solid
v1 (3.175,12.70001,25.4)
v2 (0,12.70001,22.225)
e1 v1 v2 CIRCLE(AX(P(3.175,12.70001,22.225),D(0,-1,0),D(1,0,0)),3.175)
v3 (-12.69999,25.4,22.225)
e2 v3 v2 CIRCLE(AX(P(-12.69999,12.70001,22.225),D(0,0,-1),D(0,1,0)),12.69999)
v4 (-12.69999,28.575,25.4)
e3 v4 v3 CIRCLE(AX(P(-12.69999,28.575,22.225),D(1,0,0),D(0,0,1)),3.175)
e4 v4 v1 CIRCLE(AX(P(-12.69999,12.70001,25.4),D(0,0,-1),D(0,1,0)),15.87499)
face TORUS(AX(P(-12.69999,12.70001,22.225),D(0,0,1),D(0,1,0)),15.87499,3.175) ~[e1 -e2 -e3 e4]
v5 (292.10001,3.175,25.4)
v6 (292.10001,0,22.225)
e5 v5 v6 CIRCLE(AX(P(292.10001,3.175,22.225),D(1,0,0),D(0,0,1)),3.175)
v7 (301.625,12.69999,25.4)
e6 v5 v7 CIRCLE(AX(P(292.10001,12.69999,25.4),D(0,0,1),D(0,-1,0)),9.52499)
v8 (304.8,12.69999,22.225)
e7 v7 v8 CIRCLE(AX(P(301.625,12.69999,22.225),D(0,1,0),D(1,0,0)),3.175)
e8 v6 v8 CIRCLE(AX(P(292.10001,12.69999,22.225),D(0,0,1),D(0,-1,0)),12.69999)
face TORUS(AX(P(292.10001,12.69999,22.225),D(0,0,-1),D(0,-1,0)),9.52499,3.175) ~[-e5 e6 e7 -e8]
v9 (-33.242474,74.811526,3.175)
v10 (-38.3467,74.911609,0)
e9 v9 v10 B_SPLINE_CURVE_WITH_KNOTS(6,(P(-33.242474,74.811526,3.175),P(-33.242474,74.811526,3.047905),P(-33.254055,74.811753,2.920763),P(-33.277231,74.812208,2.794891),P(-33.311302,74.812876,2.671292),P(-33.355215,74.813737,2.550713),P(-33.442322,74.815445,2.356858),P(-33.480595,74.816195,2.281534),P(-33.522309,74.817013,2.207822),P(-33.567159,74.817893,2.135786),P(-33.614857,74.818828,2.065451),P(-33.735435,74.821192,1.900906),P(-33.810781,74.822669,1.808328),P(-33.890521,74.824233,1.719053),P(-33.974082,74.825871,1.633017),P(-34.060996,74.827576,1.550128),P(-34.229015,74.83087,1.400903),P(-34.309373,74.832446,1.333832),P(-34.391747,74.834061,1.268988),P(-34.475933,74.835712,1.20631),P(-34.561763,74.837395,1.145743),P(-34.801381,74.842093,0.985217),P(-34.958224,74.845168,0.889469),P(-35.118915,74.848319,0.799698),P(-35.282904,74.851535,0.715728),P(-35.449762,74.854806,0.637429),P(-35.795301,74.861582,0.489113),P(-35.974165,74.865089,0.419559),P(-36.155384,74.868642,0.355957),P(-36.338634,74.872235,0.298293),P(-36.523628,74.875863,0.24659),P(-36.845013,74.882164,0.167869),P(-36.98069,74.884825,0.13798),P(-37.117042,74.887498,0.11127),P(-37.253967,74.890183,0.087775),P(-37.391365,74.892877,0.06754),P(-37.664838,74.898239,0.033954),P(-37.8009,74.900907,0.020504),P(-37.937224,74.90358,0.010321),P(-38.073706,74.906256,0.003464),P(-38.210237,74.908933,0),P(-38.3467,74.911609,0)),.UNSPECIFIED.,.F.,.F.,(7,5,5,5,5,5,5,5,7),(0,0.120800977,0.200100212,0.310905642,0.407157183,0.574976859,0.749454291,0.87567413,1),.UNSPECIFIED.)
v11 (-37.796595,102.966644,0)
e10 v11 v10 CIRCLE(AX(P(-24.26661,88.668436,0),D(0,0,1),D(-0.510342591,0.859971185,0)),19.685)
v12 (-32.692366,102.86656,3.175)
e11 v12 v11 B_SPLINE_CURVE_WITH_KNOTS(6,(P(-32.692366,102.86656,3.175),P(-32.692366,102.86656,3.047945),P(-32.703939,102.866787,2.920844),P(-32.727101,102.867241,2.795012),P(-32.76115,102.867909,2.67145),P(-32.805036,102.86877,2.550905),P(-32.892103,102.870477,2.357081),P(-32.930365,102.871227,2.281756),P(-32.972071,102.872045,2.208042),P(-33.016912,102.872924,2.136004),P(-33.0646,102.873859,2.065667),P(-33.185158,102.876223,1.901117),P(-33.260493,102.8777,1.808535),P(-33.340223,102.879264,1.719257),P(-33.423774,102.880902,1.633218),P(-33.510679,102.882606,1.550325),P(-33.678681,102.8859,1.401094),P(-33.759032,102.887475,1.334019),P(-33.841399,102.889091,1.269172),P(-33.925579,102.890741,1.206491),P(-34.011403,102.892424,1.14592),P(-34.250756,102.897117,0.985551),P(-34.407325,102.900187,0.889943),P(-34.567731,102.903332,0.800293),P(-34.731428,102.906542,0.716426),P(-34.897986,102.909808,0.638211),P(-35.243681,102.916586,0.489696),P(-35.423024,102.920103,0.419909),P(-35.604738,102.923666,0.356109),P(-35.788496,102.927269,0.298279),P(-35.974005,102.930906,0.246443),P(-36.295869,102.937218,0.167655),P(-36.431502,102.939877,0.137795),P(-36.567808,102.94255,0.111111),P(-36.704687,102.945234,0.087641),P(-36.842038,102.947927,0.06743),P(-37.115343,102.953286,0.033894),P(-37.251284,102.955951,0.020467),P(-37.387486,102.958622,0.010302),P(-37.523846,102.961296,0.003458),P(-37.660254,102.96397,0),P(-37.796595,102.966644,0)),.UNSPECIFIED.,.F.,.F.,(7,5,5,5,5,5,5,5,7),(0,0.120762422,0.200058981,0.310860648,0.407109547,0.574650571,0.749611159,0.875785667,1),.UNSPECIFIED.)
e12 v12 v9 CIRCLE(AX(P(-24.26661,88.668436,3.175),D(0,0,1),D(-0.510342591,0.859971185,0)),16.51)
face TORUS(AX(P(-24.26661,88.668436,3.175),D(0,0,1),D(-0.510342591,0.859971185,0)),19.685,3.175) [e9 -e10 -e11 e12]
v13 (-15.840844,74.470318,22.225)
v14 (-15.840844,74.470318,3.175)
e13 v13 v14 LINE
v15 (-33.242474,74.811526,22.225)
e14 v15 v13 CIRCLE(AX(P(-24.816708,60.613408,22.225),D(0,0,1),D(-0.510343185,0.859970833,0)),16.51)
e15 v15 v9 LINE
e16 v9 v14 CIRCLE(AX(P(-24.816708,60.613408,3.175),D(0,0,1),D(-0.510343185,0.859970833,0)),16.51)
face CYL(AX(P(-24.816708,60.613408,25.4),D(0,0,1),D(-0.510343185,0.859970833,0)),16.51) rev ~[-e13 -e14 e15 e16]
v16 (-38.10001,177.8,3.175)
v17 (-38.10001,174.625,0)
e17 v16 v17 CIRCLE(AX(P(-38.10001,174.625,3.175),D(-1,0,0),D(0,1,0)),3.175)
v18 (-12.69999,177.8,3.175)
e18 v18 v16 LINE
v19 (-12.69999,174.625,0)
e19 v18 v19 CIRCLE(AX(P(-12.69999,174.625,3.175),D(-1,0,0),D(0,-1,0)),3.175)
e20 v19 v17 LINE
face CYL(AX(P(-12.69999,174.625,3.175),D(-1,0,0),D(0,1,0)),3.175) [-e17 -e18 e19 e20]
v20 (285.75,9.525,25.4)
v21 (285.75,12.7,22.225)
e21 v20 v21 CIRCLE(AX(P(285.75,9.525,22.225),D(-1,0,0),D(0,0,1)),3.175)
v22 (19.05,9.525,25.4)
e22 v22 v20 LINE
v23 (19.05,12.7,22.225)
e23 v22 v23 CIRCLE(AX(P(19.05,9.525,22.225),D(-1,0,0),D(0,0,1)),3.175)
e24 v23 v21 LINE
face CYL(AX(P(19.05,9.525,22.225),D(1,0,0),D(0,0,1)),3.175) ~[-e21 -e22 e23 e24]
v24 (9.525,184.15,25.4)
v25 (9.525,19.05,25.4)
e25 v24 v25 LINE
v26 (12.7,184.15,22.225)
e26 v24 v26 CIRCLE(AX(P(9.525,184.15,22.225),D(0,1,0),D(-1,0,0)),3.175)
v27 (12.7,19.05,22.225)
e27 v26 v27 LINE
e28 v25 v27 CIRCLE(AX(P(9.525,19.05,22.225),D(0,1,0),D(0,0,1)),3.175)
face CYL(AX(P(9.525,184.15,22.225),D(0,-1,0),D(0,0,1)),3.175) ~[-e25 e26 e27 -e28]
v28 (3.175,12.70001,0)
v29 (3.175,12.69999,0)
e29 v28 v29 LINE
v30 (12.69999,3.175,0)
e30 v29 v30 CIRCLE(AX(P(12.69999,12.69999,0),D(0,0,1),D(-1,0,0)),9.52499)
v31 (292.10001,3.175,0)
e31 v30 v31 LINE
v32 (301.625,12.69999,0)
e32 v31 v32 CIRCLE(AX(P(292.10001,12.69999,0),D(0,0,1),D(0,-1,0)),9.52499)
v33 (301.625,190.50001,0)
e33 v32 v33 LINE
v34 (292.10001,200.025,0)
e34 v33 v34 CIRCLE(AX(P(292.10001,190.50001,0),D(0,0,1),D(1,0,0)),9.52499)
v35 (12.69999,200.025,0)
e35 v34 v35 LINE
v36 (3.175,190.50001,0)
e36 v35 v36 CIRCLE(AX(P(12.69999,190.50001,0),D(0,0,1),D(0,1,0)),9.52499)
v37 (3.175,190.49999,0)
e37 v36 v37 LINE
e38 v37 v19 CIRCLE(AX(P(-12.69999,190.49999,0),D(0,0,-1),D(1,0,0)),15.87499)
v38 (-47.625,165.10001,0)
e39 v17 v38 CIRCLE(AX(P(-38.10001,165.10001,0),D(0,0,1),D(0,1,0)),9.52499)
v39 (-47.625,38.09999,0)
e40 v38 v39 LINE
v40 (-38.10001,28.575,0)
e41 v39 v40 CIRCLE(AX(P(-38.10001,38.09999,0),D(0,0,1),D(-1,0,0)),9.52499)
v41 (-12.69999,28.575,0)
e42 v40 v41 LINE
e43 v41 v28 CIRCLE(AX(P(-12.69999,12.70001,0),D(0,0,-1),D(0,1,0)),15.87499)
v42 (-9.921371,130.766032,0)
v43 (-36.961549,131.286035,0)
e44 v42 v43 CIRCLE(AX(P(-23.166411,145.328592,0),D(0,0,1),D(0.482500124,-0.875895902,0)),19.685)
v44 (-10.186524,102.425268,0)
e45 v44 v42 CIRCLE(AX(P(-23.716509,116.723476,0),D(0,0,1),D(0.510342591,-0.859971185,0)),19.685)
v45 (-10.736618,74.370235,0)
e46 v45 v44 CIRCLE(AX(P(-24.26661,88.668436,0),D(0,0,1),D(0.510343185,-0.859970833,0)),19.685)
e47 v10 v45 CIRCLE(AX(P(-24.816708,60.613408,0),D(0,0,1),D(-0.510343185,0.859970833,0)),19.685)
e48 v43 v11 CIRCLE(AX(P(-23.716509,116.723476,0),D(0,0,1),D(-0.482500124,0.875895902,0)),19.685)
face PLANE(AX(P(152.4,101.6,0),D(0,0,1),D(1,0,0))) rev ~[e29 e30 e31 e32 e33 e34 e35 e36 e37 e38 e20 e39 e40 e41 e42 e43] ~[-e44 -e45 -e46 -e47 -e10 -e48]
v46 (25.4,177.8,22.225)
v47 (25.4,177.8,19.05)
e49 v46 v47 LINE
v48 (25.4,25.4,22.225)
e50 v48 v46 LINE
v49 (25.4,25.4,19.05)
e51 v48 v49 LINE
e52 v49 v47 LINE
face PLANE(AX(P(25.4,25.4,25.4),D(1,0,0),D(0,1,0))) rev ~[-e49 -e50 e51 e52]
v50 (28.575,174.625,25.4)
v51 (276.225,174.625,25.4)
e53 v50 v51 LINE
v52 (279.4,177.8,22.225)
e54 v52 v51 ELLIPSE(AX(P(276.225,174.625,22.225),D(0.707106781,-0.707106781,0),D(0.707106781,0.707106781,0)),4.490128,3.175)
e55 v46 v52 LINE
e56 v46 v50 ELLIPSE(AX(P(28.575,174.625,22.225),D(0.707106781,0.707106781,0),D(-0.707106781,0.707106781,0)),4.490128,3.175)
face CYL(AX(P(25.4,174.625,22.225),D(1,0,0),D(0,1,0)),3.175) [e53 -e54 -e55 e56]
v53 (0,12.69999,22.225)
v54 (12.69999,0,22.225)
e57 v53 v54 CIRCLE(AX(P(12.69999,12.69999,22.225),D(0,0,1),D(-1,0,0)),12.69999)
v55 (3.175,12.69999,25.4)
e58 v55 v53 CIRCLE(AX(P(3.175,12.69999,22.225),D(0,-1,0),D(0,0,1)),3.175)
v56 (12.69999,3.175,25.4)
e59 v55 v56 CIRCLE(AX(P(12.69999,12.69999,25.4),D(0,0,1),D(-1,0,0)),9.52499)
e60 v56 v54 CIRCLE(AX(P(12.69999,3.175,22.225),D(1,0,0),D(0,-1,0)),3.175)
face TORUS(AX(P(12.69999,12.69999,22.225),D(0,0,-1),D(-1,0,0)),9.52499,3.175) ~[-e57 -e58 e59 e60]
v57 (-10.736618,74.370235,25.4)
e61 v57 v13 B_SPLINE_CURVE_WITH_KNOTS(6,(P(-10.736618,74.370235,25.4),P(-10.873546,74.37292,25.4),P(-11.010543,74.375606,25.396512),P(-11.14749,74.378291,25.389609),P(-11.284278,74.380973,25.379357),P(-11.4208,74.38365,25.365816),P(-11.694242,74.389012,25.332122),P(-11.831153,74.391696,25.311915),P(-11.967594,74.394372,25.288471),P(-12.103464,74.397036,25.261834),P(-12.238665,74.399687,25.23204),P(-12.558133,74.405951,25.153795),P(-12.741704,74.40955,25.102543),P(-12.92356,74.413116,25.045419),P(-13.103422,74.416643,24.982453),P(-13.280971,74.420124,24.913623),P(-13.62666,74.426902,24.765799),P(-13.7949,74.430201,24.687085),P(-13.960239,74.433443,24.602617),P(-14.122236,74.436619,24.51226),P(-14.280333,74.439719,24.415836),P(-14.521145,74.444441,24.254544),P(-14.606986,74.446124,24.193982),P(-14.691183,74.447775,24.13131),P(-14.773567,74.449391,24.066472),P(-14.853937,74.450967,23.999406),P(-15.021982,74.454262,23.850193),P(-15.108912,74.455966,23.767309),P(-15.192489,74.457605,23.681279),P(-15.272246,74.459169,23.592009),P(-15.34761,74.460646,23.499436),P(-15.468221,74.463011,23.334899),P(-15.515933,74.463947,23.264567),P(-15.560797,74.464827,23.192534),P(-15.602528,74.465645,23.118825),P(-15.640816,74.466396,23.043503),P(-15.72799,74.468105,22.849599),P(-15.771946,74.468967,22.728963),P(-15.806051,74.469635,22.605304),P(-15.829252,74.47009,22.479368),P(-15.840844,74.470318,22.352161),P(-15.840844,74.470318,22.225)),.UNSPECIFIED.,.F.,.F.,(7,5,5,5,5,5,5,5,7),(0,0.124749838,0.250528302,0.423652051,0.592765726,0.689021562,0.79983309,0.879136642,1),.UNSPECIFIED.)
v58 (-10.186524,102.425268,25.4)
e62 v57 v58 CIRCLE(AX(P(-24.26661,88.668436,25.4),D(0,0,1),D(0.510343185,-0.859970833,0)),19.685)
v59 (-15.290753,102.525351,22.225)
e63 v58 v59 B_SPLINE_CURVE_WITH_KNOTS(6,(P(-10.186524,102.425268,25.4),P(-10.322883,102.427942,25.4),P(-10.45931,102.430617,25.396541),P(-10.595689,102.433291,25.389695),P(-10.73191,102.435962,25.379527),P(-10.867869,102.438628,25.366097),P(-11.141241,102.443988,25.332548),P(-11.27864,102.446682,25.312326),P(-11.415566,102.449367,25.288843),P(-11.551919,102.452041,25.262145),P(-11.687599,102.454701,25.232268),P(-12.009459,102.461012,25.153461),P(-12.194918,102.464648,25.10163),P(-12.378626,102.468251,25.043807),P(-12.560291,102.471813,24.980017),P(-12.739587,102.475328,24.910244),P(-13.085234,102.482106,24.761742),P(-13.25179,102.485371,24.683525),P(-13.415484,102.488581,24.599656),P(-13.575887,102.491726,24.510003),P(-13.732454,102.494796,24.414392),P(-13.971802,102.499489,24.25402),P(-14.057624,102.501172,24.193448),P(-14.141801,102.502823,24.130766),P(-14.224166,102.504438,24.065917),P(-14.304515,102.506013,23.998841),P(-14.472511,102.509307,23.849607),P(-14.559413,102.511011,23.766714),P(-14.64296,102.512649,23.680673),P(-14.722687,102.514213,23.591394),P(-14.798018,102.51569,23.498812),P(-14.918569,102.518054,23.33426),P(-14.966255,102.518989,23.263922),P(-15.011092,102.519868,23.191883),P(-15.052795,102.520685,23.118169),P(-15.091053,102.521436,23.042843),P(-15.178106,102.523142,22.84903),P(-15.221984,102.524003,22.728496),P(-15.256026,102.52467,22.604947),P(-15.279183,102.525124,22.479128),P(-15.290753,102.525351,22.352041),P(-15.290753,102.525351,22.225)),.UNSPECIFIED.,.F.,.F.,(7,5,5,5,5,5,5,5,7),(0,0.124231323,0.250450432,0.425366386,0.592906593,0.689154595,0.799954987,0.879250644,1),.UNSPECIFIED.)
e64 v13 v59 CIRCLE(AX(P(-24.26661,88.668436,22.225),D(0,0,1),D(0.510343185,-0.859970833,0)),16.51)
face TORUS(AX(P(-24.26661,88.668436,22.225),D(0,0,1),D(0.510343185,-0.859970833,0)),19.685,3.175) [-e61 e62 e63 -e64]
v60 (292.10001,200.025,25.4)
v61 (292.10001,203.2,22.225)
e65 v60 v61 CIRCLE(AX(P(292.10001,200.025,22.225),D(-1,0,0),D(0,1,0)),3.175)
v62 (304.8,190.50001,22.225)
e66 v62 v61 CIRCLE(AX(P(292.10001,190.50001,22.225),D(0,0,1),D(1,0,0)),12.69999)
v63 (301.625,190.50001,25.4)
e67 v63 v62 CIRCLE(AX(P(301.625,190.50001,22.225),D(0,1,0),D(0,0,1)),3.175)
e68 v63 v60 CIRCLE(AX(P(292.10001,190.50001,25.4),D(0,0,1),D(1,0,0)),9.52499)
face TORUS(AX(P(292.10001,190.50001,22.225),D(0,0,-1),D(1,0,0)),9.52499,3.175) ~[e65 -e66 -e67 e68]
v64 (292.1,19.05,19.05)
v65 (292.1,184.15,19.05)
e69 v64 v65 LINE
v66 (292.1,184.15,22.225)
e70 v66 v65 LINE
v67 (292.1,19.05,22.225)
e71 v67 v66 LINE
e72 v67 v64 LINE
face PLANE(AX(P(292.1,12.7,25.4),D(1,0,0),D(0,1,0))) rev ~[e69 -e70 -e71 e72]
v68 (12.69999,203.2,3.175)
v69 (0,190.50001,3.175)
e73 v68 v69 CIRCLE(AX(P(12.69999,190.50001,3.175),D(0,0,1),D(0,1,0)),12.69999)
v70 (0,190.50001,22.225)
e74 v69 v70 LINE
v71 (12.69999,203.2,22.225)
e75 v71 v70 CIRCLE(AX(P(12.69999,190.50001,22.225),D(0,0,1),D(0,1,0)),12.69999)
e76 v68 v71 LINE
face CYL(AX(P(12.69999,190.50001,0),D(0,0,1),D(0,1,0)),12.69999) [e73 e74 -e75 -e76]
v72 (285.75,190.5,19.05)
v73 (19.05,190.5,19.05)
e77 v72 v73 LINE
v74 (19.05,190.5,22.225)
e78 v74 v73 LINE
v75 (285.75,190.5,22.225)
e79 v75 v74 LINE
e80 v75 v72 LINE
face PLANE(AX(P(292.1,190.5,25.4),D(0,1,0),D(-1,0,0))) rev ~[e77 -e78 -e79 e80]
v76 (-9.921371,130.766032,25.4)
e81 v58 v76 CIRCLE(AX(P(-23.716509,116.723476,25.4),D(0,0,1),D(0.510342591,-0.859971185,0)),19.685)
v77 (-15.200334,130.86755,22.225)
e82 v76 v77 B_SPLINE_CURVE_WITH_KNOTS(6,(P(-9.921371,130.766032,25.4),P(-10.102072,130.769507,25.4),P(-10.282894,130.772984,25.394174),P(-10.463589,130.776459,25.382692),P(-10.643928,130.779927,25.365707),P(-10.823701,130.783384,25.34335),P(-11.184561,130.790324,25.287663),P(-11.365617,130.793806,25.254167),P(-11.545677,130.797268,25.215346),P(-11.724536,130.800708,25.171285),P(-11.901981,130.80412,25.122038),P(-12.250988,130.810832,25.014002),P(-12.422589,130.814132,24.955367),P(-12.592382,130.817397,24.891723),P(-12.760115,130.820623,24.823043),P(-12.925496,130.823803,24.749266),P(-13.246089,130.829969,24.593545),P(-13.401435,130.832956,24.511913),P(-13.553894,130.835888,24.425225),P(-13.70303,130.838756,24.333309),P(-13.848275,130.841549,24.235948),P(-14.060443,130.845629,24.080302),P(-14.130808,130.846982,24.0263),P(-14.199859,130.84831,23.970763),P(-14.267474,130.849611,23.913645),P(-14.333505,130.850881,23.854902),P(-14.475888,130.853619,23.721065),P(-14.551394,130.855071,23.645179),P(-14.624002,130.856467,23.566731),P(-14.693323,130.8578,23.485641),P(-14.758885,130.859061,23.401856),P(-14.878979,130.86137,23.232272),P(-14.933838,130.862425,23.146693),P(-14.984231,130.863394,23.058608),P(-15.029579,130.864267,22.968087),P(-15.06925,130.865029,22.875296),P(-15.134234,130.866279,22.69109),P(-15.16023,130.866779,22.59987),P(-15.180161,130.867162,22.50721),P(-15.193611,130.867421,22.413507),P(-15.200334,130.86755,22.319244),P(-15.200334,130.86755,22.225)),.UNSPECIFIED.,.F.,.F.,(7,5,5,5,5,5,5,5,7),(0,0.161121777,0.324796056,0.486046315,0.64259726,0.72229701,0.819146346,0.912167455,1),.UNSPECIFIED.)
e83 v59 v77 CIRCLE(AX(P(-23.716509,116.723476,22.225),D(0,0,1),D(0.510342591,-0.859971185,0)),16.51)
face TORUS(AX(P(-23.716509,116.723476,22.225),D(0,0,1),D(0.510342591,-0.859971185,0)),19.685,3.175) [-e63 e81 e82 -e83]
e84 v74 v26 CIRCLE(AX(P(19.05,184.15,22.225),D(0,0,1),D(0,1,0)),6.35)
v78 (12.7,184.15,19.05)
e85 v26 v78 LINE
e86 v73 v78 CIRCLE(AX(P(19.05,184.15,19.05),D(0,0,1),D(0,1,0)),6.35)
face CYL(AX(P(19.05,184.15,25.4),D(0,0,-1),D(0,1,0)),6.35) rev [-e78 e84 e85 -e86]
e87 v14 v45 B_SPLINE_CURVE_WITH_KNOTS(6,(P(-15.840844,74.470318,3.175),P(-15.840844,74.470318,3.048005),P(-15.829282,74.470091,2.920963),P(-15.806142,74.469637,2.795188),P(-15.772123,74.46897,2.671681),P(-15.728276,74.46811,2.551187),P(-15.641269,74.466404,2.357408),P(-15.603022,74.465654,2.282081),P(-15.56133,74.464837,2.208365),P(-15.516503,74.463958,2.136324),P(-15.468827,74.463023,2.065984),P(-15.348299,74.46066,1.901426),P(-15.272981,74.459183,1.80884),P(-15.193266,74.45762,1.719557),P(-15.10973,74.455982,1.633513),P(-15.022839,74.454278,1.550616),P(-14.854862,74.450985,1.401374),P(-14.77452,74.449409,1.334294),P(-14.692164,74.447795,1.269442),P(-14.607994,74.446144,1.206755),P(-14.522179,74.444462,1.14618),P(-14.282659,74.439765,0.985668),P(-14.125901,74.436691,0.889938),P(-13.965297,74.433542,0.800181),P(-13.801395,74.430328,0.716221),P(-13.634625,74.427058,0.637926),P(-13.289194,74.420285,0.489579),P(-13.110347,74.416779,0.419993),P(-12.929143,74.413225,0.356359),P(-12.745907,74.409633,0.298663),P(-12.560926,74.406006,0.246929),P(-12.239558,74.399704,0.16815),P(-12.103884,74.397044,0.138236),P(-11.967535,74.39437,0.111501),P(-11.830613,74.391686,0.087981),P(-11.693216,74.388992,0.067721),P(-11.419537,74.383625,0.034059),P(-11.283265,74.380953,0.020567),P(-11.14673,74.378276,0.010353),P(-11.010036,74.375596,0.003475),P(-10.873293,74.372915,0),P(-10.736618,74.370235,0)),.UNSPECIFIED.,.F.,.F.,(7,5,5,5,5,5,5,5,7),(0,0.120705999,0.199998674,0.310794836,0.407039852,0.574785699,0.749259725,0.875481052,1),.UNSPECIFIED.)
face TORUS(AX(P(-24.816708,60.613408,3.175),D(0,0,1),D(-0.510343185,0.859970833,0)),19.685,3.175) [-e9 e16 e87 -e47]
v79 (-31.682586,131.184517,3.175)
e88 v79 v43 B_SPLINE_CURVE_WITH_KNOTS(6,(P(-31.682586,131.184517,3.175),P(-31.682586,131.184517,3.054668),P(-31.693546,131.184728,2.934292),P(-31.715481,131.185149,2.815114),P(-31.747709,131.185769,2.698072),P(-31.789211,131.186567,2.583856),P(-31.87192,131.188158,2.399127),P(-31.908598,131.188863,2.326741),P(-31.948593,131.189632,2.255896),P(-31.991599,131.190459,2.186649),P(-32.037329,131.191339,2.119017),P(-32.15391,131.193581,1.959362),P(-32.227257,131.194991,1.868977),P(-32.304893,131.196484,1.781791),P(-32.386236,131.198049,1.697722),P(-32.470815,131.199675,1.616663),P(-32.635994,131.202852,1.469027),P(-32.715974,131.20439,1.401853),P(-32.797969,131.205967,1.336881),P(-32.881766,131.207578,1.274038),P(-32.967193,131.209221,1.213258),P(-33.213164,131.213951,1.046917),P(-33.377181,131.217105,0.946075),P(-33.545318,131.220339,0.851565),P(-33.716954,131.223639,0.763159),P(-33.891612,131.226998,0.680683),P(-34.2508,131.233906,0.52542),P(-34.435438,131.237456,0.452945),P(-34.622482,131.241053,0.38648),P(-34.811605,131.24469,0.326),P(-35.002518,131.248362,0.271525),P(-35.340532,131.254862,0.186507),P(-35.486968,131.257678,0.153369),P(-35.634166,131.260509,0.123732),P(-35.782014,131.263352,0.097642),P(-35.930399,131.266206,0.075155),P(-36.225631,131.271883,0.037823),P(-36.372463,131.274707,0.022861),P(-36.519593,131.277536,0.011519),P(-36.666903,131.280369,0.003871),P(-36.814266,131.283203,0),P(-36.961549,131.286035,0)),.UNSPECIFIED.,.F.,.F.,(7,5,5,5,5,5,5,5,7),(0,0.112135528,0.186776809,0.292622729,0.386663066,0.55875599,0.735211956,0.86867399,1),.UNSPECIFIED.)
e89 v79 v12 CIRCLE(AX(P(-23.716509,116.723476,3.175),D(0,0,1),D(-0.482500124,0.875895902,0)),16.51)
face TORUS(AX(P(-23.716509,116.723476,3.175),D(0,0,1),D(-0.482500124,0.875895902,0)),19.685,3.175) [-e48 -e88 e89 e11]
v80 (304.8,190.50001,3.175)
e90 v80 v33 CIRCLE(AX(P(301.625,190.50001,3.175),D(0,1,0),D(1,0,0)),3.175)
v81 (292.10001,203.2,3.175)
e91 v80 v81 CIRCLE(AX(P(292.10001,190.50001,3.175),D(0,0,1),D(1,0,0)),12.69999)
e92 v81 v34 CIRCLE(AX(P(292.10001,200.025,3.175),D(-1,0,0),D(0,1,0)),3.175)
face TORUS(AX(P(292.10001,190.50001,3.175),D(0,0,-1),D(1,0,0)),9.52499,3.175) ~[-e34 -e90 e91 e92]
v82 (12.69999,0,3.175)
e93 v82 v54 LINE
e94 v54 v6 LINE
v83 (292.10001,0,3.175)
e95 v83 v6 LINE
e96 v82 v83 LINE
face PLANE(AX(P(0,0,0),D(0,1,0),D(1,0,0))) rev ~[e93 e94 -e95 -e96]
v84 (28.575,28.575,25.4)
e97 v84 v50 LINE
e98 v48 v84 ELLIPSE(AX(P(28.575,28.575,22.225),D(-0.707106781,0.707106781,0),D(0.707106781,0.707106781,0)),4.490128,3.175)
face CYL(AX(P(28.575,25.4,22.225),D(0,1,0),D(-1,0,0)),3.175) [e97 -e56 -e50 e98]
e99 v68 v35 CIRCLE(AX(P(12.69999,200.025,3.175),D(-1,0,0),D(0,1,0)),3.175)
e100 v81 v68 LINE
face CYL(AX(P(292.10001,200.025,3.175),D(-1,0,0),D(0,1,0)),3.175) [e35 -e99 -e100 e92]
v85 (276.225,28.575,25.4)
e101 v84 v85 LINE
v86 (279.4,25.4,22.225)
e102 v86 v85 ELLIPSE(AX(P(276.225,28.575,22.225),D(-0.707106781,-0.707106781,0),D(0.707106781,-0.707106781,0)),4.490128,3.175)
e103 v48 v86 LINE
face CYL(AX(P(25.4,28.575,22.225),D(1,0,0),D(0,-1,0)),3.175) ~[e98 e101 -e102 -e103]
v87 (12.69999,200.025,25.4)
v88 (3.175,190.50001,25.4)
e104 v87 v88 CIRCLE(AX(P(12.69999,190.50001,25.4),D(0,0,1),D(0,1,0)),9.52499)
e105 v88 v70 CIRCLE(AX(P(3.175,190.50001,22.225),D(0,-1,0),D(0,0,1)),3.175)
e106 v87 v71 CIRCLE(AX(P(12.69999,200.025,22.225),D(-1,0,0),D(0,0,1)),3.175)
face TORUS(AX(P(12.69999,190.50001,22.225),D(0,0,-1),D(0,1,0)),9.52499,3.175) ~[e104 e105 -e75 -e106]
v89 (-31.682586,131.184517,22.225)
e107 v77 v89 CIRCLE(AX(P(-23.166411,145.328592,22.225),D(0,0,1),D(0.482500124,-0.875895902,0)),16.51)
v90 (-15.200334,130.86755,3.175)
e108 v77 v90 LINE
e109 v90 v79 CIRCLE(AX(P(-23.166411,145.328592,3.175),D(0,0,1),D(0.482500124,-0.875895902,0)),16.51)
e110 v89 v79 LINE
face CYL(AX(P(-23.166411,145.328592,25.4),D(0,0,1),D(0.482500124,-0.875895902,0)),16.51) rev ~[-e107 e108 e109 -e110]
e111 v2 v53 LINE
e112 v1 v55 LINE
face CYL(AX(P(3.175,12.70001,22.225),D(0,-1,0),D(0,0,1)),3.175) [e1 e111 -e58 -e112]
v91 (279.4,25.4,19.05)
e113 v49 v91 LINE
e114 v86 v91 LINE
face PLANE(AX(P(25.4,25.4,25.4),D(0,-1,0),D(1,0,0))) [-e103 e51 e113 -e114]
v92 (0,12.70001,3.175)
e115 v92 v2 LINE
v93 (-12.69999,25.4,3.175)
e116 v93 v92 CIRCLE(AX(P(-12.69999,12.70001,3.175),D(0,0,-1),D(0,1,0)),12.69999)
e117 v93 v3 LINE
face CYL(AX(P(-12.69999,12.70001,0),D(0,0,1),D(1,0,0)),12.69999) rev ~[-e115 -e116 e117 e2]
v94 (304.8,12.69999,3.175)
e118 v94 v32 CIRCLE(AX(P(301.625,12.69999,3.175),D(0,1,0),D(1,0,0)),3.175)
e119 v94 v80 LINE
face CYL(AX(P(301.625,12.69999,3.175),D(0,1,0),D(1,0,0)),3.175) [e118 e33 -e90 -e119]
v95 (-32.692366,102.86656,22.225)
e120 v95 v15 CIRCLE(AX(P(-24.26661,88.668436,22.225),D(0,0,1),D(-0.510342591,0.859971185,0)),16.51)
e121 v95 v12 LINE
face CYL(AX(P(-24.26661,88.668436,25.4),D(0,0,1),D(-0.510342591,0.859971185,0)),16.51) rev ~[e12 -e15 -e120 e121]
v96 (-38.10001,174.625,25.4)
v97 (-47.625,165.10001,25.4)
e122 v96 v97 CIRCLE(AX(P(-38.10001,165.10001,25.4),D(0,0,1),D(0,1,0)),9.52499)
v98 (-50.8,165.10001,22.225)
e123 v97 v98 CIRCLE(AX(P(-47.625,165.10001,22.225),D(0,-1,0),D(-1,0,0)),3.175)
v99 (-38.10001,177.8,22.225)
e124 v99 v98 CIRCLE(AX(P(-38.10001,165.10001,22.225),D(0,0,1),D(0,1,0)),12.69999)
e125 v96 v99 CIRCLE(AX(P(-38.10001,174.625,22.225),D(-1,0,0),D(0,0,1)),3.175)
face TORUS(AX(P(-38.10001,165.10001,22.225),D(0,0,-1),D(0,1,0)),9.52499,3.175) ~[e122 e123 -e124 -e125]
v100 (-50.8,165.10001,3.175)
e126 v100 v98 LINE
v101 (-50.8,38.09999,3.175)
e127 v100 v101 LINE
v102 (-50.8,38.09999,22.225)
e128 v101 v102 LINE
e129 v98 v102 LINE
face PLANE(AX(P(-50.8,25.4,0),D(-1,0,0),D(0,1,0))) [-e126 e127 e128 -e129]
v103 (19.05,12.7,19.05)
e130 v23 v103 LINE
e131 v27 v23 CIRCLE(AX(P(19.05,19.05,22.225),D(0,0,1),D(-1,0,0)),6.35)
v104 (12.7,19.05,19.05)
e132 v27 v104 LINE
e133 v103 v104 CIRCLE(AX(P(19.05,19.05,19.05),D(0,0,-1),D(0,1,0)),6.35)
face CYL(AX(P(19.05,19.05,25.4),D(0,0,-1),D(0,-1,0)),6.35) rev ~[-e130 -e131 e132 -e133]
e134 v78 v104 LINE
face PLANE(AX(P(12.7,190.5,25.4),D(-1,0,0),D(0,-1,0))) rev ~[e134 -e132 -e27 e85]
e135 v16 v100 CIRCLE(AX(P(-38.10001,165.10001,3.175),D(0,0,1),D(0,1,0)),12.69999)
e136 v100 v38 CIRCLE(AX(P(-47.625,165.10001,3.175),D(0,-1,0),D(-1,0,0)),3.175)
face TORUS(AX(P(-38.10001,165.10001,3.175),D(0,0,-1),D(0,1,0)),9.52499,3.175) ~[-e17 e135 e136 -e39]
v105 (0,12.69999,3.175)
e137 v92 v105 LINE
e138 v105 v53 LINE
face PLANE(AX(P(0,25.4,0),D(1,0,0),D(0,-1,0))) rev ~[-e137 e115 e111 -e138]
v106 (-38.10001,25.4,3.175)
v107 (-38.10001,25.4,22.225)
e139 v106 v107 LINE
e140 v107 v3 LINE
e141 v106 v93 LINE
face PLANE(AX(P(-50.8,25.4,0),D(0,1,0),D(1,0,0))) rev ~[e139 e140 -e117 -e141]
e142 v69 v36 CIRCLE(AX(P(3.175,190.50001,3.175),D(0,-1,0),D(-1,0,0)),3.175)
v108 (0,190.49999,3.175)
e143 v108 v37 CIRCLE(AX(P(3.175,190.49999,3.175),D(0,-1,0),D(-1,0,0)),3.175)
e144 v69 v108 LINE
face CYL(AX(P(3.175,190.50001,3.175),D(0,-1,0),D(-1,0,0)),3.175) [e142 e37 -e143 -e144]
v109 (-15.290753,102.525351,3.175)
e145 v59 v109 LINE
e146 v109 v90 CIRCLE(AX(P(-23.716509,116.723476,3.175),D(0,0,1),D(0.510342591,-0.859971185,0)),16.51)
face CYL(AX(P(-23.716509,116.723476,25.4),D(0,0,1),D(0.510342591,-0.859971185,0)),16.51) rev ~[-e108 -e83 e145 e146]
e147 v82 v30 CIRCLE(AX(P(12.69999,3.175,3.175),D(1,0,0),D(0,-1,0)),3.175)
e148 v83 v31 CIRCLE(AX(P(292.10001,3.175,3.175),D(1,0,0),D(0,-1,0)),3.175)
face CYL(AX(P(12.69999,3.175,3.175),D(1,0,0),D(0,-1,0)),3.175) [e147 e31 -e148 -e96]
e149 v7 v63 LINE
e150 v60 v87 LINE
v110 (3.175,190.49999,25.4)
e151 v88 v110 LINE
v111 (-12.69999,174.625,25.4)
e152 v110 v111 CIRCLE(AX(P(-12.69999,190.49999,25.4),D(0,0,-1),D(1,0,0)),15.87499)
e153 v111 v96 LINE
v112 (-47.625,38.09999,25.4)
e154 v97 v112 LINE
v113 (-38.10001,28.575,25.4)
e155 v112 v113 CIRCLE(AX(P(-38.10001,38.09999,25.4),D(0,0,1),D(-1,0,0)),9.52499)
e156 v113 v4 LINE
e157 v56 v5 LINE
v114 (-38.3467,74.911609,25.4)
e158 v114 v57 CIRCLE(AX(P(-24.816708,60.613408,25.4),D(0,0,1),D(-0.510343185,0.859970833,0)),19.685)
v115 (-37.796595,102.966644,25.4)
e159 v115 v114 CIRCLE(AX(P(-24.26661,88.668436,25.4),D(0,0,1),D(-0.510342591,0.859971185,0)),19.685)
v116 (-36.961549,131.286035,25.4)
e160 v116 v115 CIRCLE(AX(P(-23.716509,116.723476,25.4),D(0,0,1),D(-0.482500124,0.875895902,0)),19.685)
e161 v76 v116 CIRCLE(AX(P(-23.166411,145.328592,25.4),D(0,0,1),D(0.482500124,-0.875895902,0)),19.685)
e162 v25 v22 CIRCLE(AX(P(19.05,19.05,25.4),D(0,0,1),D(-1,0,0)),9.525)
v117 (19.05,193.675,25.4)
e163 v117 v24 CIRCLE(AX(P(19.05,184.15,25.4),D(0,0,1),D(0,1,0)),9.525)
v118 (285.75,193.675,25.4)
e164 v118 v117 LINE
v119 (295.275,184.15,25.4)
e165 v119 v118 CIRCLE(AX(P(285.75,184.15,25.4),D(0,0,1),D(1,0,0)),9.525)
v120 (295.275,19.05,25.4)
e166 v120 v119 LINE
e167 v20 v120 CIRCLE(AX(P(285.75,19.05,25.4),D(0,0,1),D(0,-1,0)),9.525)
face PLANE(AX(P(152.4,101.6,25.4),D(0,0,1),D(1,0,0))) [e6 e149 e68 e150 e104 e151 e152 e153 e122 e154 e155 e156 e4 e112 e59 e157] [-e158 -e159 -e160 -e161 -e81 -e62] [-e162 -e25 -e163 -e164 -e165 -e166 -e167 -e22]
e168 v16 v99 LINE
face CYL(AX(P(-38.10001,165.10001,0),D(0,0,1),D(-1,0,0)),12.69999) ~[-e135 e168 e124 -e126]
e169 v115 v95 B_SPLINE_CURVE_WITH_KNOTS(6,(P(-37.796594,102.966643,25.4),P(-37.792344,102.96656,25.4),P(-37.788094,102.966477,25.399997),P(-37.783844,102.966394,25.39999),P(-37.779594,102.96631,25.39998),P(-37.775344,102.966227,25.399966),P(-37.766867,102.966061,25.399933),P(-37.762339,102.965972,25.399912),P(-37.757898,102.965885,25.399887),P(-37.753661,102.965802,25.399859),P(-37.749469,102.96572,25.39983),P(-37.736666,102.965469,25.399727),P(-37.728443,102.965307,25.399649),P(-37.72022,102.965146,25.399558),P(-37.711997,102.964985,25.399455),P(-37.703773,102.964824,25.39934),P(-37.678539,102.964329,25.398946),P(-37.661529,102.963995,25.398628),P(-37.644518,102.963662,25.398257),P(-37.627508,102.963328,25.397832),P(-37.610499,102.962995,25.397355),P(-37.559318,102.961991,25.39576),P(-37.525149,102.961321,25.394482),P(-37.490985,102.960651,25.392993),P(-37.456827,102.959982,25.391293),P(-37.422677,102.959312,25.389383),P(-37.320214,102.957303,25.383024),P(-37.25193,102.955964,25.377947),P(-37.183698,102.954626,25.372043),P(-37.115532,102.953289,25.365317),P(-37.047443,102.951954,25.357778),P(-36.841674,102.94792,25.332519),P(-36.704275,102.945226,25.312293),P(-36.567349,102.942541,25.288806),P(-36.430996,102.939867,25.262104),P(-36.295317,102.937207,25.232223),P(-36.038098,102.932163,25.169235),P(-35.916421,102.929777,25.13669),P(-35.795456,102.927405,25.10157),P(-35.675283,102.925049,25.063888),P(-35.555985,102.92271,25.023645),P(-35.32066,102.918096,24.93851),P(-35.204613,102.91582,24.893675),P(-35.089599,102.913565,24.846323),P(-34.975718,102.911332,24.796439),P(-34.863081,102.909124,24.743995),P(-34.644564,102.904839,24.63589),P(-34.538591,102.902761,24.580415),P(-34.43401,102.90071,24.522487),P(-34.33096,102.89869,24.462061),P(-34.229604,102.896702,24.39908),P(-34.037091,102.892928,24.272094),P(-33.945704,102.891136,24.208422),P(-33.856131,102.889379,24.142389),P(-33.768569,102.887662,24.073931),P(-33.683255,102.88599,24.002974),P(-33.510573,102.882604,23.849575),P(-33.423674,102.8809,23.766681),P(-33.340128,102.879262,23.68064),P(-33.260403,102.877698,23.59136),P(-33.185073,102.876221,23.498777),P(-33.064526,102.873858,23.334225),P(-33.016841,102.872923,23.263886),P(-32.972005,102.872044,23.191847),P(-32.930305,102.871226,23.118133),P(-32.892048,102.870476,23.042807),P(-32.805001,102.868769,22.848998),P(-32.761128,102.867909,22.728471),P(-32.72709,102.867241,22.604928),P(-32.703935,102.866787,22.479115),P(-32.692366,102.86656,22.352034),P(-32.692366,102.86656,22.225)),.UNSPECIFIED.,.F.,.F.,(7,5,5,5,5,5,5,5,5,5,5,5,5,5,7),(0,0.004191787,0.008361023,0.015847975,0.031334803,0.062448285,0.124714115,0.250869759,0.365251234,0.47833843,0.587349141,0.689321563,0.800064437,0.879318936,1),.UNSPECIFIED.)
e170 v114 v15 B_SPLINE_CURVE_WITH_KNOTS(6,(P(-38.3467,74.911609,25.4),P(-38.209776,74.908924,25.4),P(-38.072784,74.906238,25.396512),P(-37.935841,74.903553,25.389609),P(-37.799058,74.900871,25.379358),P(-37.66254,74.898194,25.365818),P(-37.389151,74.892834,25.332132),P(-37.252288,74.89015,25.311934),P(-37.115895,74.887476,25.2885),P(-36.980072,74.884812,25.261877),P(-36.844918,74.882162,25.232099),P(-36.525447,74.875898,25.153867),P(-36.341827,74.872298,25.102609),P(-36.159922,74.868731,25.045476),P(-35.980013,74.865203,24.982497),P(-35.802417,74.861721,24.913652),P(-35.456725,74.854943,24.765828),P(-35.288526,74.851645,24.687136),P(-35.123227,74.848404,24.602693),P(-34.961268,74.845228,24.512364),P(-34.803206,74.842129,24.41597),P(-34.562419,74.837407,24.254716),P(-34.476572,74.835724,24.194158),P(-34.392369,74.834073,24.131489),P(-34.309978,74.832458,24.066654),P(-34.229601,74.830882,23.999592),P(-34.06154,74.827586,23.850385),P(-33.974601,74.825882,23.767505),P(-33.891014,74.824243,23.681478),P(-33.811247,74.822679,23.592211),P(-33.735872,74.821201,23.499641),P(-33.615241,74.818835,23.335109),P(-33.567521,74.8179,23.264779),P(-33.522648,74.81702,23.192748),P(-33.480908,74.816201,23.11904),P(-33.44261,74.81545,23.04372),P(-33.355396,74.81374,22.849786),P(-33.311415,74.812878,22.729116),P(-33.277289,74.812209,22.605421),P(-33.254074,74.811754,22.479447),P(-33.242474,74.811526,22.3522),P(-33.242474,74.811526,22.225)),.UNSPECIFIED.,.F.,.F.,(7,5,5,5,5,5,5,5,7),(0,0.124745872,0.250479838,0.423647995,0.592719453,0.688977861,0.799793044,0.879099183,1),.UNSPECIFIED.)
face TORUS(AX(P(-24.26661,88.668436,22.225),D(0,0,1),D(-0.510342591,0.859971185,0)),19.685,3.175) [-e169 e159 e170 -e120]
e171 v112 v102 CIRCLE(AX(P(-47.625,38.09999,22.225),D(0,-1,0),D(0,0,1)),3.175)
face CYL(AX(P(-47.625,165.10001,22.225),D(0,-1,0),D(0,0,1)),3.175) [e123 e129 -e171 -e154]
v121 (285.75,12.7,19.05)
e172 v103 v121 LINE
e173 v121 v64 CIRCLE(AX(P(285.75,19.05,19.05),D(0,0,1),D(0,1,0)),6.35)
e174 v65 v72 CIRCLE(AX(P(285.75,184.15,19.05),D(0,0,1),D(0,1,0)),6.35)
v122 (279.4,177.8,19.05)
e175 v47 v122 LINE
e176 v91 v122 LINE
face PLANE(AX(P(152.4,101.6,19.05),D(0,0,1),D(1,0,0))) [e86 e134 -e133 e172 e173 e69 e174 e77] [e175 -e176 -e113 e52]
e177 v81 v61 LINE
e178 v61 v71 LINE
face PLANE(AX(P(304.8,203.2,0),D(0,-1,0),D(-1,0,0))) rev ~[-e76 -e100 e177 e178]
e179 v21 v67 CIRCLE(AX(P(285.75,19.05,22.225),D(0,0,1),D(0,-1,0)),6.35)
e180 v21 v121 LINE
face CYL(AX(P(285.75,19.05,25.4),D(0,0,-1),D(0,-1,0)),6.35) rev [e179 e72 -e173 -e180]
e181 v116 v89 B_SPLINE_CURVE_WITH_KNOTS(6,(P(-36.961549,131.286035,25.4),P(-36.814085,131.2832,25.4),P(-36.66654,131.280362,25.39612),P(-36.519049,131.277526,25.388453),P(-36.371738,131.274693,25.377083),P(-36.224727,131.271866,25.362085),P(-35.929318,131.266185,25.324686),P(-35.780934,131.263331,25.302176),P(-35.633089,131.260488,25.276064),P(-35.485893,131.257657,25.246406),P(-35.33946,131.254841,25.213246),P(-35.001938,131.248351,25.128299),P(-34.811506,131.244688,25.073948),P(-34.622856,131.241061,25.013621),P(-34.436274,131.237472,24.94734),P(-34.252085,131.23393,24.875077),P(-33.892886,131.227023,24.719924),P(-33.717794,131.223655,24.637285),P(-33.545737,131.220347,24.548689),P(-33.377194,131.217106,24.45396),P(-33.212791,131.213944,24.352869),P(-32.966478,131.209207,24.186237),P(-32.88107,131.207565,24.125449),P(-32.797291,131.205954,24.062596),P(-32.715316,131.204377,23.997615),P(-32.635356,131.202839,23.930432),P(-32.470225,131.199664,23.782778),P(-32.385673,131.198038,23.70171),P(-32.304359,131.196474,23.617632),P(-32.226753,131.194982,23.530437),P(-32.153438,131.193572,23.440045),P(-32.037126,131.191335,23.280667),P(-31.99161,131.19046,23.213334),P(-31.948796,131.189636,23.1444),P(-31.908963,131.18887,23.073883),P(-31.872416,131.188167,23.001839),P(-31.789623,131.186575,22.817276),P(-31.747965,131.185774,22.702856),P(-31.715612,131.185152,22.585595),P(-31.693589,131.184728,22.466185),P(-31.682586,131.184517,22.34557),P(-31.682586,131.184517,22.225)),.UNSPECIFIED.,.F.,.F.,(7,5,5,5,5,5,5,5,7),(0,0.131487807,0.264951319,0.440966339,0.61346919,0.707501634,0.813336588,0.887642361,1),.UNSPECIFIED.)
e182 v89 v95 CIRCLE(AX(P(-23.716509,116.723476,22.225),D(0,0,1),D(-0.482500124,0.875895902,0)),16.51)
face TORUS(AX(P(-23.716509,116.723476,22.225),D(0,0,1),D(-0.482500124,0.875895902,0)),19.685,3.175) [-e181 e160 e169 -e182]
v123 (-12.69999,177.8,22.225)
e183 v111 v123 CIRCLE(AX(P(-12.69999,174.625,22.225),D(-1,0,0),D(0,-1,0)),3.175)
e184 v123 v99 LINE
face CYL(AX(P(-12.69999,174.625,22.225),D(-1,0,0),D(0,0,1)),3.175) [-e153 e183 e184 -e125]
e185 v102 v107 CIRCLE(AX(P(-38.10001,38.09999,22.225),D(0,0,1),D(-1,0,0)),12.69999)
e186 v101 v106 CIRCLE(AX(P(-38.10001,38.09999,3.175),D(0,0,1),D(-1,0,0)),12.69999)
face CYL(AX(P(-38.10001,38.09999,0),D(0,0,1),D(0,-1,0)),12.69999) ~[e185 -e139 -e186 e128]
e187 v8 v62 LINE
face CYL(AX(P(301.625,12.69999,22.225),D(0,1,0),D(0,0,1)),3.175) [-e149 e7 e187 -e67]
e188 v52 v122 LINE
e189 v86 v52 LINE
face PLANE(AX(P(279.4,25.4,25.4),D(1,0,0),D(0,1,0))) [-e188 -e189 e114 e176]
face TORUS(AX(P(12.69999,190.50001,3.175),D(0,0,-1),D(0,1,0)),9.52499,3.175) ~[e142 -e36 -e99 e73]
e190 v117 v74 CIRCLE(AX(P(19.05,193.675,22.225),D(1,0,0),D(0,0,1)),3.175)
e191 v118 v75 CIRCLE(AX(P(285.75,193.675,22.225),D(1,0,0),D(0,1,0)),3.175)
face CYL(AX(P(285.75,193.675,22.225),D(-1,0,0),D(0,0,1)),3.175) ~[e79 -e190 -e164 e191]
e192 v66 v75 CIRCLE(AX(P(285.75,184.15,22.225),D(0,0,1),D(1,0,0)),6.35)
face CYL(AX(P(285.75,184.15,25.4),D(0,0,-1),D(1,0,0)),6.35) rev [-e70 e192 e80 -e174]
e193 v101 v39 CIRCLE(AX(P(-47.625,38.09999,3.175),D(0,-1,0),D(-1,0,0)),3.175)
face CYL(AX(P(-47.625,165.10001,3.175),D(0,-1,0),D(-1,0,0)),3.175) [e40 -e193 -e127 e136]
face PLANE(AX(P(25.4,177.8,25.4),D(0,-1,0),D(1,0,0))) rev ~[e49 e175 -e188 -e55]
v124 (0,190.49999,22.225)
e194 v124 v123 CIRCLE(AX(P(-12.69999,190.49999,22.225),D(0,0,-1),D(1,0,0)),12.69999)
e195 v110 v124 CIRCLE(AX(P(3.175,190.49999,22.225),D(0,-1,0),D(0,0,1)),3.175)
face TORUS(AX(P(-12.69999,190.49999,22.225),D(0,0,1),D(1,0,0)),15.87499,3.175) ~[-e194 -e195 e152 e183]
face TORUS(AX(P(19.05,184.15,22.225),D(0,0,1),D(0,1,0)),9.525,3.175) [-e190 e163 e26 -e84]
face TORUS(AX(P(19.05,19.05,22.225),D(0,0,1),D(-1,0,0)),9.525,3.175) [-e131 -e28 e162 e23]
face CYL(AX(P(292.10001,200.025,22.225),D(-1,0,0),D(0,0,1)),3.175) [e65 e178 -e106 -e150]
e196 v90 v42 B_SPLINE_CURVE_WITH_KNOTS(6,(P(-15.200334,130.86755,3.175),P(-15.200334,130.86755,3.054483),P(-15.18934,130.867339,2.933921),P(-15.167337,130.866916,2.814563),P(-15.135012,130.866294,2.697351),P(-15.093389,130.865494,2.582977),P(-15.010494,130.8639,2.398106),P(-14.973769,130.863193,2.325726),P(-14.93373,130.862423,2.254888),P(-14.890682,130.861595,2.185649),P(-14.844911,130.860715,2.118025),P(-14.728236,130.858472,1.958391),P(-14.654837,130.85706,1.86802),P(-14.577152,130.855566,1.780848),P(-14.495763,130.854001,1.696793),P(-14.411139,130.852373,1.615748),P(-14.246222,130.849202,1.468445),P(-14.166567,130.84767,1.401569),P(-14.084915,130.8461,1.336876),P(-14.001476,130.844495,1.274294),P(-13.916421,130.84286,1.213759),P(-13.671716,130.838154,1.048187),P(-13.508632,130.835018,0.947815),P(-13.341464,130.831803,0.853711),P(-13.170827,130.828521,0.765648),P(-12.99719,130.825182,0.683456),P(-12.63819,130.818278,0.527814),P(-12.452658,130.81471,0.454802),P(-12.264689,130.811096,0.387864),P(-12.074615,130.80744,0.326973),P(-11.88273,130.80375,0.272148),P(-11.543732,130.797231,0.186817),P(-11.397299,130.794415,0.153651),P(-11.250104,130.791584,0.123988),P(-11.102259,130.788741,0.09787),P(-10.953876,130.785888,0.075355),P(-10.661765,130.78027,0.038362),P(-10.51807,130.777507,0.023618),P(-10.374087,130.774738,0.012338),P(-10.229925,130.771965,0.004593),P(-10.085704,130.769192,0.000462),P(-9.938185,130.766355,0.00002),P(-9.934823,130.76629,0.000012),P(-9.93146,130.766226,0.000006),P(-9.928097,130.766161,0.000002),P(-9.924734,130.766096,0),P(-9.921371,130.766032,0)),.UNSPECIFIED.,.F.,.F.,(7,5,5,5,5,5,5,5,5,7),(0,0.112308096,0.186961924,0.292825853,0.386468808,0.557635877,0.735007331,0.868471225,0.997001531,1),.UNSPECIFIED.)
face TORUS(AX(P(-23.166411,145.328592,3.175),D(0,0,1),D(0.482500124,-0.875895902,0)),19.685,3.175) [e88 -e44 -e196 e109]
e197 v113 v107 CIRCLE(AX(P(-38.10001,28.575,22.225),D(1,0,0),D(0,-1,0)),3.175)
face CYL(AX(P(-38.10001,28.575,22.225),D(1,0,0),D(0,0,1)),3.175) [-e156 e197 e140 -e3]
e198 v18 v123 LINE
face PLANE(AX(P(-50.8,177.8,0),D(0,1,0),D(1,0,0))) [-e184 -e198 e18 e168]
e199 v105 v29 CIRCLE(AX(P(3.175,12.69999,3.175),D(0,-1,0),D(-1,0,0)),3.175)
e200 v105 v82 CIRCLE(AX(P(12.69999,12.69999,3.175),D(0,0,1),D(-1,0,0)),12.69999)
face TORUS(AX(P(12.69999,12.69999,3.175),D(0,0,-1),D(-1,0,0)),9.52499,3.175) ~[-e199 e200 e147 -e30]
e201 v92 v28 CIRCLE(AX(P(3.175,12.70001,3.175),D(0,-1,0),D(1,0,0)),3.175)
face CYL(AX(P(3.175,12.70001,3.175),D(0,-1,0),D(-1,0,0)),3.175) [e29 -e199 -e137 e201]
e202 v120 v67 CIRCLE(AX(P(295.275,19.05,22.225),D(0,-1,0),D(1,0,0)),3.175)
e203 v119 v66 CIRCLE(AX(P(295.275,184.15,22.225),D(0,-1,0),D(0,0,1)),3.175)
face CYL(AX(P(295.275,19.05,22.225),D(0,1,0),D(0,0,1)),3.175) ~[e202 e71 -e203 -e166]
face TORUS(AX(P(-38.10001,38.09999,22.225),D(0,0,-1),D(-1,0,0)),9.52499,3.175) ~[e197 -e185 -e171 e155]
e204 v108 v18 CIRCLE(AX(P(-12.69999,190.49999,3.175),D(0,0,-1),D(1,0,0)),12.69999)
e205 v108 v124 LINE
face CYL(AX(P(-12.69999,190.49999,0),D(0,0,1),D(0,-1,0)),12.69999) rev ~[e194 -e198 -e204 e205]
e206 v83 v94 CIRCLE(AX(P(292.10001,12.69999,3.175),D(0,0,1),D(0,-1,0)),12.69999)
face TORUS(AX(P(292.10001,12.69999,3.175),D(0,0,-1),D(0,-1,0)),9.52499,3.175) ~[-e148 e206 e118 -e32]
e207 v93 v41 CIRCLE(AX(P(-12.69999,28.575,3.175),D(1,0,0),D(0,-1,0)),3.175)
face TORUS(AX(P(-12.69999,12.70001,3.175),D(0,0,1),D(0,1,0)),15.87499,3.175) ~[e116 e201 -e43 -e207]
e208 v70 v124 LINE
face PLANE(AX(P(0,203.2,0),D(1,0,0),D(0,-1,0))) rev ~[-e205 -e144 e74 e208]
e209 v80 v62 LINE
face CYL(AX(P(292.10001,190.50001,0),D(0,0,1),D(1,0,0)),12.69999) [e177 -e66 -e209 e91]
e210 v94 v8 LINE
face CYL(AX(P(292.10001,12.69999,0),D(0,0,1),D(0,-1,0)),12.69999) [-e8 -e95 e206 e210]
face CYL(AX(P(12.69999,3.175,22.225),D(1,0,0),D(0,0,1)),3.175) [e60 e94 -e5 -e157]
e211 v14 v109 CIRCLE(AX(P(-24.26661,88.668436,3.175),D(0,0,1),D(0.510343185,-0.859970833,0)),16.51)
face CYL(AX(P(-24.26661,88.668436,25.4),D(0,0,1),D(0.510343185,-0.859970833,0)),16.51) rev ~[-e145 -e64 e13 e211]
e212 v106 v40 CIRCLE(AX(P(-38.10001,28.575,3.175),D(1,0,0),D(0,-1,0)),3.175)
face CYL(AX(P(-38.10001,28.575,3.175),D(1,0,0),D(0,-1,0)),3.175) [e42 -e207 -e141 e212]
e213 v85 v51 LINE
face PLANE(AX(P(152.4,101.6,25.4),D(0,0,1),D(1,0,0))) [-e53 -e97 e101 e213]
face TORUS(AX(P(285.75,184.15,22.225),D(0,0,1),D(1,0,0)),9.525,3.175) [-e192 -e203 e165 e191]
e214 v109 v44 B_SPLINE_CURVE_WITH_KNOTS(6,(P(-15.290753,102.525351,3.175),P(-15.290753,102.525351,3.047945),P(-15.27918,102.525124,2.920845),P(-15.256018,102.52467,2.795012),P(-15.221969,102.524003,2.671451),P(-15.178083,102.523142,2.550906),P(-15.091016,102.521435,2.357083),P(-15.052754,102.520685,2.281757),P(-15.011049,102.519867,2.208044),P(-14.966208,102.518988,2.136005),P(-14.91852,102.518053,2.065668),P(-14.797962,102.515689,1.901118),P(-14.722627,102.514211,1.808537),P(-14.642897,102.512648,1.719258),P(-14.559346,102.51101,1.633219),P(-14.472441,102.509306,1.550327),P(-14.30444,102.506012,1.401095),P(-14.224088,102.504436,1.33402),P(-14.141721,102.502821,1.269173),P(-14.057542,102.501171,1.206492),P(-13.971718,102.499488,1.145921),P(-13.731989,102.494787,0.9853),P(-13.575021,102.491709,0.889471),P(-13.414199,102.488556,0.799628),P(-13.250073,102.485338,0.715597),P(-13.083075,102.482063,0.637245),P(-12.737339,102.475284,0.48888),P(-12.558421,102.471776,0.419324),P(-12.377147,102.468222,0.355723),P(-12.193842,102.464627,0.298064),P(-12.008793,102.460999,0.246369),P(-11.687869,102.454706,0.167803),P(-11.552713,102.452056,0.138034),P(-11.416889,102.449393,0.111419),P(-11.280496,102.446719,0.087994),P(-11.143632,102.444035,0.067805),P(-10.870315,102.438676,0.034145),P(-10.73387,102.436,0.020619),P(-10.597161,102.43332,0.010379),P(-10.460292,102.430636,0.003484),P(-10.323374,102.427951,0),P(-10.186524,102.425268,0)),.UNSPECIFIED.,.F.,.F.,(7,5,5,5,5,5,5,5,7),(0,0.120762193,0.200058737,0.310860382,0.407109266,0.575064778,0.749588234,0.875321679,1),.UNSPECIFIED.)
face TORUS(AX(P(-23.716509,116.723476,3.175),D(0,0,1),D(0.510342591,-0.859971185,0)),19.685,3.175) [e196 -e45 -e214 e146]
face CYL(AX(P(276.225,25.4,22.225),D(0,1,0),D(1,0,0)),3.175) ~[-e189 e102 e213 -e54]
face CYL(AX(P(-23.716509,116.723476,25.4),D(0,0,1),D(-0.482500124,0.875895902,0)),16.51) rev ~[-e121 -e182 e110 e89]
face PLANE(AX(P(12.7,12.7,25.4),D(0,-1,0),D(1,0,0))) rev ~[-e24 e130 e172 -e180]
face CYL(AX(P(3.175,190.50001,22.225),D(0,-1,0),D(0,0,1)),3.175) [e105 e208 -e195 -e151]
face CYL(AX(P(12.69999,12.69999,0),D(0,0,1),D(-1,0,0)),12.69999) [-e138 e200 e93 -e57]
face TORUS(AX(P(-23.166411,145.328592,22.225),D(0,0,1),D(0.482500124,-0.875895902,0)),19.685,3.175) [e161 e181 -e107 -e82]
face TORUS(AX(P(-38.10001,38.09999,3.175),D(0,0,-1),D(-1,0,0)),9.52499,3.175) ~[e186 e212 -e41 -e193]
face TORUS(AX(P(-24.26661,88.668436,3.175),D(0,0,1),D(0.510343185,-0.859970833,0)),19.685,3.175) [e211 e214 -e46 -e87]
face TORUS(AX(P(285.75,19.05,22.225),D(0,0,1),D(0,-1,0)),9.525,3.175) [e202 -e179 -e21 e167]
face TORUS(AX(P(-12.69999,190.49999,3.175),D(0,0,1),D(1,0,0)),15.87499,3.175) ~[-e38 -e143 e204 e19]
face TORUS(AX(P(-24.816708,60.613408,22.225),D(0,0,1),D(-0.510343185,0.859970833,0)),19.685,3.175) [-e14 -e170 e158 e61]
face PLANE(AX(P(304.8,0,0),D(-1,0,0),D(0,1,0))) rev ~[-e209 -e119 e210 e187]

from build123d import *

# Parameters (mm, degrees)
F0_W     = 50.8
F0_H     = 152.4
F1_DEPTH = 25.4
F4_DEPTH = 25.4
F5_W     = 254
F5_H     = 152.4
F6_DEPTH = 6.35
F7_R     = 6.35
F8_R     = 12.69999
F9_R     = 3.175


# Not quite as in the source:
# - a fillet or chamfer is up to 0.001 mm smaller than in the source, because OpenCascade refuses the exact size


with BuildPart() as f1:
    # F0 (on Top) → F1 (new body)
    with BuildSketch(Plane.XY):
        Polygon((0, 25.4), (0, 0), (304.8, 0), (304.8, 203.2), (0, 203.2), (0, 177.8), align=None)
        with Locations((-25.4, 101.6)):
            Rectangle(F0_W, F0_H)
    extrude(amount=F1_DEPTH)

    # F2 (on face) + F3 (on face) → F4 (cut)
    with BuildSketch(Plane.XY.offset(25.4)):
        with BuildLine():
            ThreePointArc((-15.2907530688, 102.525351261), (-7.2065932651, 116.6708042855), (-15.2003335319, 130.8675503052))
            ThreePointArc((-15.2003335319, 130.8675503052), (-22.8489691097, 161.8355395984), (-31.6825862945, 131.1845168667))
            ThreePointArc((-31.6825862945, 131.1845168667), (-40.2160226994, 117.3118256345), (-32.6923659242, 102.8665604024))
            ThreePointArc((-32.6923659242, 102.8665604024), (-40.7734367687, 88.9921051486), (-33.2424743946, 74.8115261652))
            ThreePointArc((-33.2424743946, 74.8115261652), (-25.1403717333, 44.1065805763), (-15.840843765, 74.470317677))
            ThreePointArc((-15.840843765, 74.470317677), (-7.7597825179, 88.3447775601), (-15.2907530688, 102.525351261))
        make_face()
    with BuildSketch(Plane.XY):
        with BuildLine():
            ThreePointArc((-15.2003335319, 130.8675503052), (-22.8489691097, 161.8355395984), (-31.6825862945, 131.1845168667))
            ThreePointArc((-31.6825862945, 131.1845168667), (-40.2160226994, 117.3118256345), (-32.6923659242, 102.8665604024))
            ThreePointArc((-32.6923659242, 102.8665604024), (-40.7734367687, 88.9921051486), (-33.2424743946, 74.8115261652))
            ThreePointArc((-33.2424743946, 74.8115261652), (-25.1403717333, 44.1065805763), (-15.840843765, 74.470317677))
            ThreePointArc((-15.840843765, 74.470317677), (-7.7597825179, 88.3447775601), (-15.2907530688, 102.525351261))
            ThreePointArc((-15.2907530688, 102.525351261), (-7.2065932651, 116.6708042855), (-15.2003335319, 130.8675503052))
        make_face()
    extrude(amount=-F4_DEPTH, mode=Mode.SUBTRACT)

    # F5 (on face) → F6 (cut)
    with BuildSketch(Plane.XY.offset(25.4)):
        Polygon((12.7, 25.4), (12.7, 12.7), (292.1, 12.7), (292.1, 190.5), (12.7, 190.5), (12.7, 177.8), align=None)
        with Locations((152.4, 101.6)):
            Rectangle(F5_W, F5_H, mode=Mode.SUBTRACT)
    extrude(amount=-F6_DEPTH, mode=Mode.SUBTRACT)

    # F7
    f7_edges = [f1.edges().sort_by_distance(p)[0] for p in [
        (12.7, 190.5, 22.225),
        (292.1, 190.5, 22.225),
        (292.1, 12.7, 22.225),
        (12.7, 12.7, 22.225),
    ]]
    fillet(f7_edges, radius=F7_R)

    # F8 (radius 12.7 in the source; OpenCascade refuses exactly that, so slightly less here)
    f8_edges = [f1.edges().sort_by_distance(p)[0] for p in [
        (304.8, 0, 12.7),
        (304.8, 203.2, 12.7),
        (0, 0, 12.7),
        (-50.8, 25.4, 12.7),
        (0, 25.4, 12.7),
        (-50.8, 177.8, 12.7),
        (0, 177.8, 12.7),
        (0, 203.2, 12.7),
    ]]
    fillet(f8_edges, radius=F8_R)

    # F9
    f9_edges = [f1.edges().sort_by_distance(p)[0] for p in [
        (152.4, 25.4, 25.4),
        (25.4, 101.6, 25.4),
        (152.4, 177.8, 25.4),
        (279.4, 101.6, 25.4),
        (0, 190.5, 25.4),
        (3.719741, 199.480259, 25.4),
        (-3.719741, 181.519741, 25.4),
        (152.4, 203.2, 25.4),
        (-25.4, 177.8, 25.4),
        (301.080259, 199.480259, 25.4),
        (-47.080259, 174.080259, 25.4),
        (304.8, 101.6, 25.4),
        (-50.8, 101.6, 25.4),
        (301.080259, 3.719741, 25.4),
        (-47.080259, 29.119741, 25.4),
        (152.4, 0, 25.4),
        (-25.4, 25.4, 25.4),
        (3.719741, 3.719741, 25.4),
        (-3.719741, 21.680259, 25.4),
        (0, 12.7, 25.4),
        (152.4, 12.7, 25.4),
        (14.559872, 14.559872, 25.4),
        (290.240128, 14.559872, 25.4),
        (12.7, 101.6, 25.4),
        (292.1, 101.6, 25.4),
        (14.559872, 188.640128, 25.4),
        (290.240128, 188.640128, 25.4),
        (152.4, 190.5, 25.4),
        (-7.206593, 116.670804, 25.4),
        (-7.759783, 88.344778, 25.4),
        (-22.848969, 161.83554, 25.4),
        (-25.140372, 44.106581, 25.4),
        (-40.216023, 117.311826, 25.4),
        (-40.773437, 88.992105, 25.4),
        (0, 190.5, 0),
        (3.719741, 199.480259, 0),
        (-3.719741, 181.519741, 0),
        (152.4, 203.2, 0),
        (-25.4, 177.8, 0),
        (301.080259, 199.480259, 0),
        (-47.080259, 174.080259, 0),
        (304.8, 101.6, 0),
        (-50.8, 101.6, 0),
        (301.080259, 3.719741, 0),
        (-47.080259, 29.119741, 0),
        (152.4, 0, 0),
        (-25.4, 25.4, 0),
        (3.719741, 3.719741, 0),
        (-3.719741, 21.680259, 0),
        (0, 12.7, 0),
        (-7.206593, 116.670804, 0),
        (-22.848969, 161.83554, 0),
        (-40.216023, 117.311826, 0),
        (-40.773437, 88.992105, 0),
        (-25.140372, 44.106581, 0),
        (-7.759783, 88.344778, 0),
    ]]
    fillet(f9_edges, radius=F9_R)


solid = f1.part
